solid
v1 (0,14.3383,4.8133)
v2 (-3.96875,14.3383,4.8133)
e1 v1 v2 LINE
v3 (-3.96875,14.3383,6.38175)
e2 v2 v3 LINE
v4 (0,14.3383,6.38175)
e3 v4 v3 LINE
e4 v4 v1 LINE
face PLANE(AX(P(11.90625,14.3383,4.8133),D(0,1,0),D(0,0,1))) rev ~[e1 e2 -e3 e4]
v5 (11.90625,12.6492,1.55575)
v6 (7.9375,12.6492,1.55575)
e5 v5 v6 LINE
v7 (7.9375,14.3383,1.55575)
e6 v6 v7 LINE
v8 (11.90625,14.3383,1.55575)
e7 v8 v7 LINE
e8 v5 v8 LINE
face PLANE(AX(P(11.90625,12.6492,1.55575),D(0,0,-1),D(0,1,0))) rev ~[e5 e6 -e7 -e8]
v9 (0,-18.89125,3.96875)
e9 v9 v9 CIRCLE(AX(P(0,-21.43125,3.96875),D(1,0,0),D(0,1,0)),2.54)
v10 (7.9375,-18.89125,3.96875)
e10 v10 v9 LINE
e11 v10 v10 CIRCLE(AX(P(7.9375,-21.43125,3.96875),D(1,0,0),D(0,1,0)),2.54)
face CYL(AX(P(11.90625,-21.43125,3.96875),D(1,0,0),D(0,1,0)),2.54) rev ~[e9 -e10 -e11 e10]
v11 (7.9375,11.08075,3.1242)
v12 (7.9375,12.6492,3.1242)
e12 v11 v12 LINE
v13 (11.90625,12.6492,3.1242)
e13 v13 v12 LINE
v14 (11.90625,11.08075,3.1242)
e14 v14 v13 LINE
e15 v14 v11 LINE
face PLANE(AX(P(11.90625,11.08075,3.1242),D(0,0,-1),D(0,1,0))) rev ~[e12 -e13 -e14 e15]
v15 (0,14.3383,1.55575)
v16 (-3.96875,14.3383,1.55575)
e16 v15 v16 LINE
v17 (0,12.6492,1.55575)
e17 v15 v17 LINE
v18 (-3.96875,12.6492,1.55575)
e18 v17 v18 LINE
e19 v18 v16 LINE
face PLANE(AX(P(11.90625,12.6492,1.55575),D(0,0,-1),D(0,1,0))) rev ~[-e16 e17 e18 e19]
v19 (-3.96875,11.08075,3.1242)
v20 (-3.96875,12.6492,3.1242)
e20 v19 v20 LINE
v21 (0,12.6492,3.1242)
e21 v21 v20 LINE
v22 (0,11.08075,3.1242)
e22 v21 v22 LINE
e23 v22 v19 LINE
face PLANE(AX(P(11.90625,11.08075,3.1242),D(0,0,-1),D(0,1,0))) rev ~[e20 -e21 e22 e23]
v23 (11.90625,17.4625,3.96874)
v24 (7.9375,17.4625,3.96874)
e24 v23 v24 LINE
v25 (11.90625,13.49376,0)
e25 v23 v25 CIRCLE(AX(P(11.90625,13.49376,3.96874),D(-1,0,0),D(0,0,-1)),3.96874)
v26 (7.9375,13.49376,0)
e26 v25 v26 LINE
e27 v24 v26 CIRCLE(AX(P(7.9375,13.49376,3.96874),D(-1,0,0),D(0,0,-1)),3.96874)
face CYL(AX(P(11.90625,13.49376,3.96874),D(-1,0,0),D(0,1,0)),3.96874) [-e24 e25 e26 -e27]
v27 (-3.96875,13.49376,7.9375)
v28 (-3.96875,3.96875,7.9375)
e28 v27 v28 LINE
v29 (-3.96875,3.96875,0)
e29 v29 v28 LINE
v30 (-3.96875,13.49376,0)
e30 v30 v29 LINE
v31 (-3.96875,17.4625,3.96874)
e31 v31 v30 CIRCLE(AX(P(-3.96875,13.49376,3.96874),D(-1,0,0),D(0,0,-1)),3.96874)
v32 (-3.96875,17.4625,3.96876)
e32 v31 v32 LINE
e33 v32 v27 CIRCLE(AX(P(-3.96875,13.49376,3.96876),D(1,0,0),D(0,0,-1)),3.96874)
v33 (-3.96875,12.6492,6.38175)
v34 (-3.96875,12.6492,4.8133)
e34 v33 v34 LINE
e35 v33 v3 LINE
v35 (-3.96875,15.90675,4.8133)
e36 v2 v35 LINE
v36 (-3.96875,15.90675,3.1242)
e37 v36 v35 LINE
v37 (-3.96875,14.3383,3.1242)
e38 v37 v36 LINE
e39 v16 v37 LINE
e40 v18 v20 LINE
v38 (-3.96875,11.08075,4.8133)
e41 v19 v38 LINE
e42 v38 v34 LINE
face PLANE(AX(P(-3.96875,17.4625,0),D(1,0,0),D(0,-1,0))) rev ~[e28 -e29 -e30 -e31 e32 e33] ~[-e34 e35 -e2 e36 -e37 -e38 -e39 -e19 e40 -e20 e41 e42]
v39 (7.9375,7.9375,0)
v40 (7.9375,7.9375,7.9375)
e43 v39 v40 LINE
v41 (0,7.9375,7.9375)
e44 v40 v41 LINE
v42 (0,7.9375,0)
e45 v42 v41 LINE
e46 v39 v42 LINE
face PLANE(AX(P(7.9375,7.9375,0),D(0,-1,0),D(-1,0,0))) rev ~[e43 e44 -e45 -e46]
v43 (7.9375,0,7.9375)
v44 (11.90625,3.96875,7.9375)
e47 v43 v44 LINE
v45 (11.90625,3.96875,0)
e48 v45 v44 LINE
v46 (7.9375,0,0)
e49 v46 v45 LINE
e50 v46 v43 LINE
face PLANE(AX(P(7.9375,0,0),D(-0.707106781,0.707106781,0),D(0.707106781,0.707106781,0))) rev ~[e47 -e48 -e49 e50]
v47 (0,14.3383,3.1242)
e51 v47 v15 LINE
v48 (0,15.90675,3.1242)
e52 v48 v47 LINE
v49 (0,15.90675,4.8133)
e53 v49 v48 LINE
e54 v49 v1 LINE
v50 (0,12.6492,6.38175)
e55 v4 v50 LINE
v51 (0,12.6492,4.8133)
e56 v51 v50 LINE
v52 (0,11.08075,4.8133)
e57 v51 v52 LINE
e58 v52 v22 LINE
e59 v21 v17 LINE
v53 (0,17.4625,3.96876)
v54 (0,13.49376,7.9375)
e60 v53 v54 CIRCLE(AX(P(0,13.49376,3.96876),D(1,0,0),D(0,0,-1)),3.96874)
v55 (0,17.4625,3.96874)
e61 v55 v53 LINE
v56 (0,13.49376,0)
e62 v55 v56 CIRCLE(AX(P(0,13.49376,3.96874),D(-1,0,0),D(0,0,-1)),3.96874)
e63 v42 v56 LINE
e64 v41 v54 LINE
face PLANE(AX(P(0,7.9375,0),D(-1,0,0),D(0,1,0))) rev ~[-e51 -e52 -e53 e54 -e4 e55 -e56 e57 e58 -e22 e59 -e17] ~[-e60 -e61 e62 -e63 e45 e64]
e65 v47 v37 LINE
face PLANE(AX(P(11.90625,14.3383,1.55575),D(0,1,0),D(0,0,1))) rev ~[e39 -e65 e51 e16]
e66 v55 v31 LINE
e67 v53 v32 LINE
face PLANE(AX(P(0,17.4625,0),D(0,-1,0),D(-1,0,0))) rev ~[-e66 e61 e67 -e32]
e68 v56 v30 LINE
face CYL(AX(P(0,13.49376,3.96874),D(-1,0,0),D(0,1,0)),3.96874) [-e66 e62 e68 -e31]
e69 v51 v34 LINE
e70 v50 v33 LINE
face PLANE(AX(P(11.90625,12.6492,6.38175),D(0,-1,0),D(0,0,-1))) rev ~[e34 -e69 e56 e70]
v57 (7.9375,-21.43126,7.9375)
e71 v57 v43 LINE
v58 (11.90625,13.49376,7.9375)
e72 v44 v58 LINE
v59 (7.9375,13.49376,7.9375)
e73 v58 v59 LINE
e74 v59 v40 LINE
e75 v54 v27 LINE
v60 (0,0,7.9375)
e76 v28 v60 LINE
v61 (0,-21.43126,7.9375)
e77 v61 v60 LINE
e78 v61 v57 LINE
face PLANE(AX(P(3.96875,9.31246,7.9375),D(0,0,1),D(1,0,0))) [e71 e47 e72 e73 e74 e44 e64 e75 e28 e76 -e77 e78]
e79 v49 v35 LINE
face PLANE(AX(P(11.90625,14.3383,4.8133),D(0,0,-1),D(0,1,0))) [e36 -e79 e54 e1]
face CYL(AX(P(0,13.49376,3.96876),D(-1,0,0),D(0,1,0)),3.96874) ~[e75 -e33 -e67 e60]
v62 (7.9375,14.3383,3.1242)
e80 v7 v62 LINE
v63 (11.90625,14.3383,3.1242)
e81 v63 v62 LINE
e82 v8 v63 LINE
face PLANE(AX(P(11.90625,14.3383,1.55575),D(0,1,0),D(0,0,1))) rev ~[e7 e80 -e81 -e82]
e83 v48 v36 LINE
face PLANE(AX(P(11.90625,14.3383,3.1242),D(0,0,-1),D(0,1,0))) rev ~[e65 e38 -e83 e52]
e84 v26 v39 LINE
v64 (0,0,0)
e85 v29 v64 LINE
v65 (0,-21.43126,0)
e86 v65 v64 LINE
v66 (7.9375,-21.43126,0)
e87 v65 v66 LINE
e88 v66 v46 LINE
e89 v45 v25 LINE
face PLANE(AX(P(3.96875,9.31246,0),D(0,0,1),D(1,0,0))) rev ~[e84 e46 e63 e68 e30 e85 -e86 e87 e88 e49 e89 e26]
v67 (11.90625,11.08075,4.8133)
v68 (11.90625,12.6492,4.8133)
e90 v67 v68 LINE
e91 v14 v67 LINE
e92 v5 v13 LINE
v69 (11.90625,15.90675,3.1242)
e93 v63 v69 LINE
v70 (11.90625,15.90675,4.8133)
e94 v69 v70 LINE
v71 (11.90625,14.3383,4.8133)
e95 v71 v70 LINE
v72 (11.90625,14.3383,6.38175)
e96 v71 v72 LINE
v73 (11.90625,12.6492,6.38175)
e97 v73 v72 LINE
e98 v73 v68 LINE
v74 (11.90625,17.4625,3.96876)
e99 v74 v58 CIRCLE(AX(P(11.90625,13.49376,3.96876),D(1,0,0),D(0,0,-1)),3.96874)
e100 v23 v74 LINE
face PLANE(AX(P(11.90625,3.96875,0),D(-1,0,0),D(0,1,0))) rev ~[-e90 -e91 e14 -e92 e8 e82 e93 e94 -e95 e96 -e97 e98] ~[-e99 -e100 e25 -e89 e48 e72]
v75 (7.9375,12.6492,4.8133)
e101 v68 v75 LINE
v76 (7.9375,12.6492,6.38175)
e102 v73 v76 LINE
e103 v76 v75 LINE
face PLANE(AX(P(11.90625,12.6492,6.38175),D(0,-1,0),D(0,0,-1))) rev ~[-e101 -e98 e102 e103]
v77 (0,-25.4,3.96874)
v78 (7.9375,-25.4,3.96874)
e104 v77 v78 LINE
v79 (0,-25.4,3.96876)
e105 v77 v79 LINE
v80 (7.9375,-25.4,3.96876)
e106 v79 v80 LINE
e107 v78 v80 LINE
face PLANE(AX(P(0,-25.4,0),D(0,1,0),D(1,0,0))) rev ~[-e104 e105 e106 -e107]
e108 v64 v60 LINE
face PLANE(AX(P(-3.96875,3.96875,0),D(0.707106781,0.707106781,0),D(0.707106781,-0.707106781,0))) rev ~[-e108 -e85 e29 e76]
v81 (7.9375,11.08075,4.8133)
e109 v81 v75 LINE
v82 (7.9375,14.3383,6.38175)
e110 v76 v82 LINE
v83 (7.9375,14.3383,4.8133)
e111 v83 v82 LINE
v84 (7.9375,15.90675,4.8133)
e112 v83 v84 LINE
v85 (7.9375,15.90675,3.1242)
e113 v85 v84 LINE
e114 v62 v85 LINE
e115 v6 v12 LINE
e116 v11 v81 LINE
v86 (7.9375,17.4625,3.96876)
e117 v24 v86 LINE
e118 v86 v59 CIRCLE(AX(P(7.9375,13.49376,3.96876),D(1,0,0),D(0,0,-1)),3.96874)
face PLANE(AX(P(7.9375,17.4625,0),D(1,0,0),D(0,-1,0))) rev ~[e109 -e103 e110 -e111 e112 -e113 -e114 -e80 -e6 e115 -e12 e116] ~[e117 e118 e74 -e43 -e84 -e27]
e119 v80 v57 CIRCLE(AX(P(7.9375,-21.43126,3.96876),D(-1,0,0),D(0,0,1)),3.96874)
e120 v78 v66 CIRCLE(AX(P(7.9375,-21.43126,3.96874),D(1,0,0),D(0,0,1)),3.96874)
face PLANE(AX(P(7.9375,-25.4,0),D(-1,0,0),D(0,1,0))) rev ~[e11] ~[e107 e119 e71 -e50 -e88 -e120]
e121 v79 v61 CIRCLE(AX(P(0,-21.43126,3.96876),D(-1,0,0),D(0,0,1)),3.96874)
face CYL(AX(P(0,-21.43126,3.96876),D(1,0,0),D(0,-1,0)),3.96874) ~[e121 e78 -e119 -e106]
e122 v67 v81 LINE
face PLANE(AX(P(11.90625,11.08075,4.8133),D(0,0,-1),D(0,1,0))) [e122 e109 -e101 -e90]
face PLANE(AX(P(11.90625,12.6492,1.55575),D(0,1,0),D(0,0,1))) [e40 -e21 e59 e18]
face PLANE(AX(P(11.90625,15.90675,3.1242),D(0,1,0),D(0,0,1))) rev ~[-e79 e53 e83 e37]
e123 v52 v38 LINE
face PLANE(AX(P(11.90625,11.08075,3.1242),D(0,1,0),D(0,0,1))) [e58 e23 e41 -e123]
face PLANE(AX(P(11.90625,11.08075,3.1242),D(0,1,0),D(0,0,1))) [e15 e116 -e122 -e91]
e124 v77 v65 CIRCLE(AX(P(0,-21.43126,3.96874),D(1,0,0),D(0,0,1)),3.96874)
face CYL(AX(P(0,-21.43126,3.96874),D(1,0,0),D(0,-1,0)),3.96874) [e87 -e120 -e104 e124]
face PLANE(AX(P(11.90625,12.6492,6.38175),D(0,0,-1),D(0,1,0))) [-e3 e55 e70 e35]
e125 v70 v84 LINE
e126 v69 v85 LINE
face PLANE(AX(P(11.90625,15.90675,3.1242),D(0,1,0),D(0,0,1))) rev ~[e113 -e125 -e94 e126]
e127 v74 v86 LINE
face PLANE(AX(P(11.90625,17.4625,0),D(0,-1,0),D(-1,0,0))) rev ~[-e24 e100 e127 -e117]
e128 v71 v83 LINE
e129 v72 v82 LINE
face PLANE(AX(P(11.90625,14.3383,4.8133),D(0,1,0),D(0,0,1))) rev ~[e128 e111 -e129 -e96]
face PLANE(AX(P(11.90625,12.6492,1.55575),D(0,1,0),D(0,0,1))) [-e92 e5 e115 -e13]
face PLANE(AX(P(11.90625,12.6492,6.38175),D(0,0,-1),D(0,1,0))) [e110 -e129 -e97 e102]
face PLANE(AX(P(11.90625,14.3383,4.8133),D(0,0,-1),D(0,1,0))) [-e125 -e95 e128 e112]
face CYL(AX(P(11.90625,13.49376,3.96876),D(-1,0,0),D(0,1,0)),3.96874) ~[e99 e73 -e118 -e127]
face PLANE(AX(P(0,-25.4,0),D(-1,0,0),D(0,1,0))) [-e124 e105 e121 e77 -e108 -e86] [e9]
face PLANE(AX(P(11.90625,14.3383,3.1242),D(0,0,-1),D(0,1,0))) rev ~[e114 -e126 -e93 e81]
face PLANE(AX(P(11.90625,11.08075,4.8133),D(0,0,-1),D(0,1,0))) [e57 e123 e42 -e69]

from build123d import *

# Parameters (mm, degrees)
F0_W     = 7.9375
F0_H     = 25.4
F1_DEPTH = 7.9375
F2_R     = 3.96874
F3_W     = 1.6891
F3_H     = 1.56845
F3_W_2   = 1.56845
F3_H_2   = 1.6891
F3_R     = 2.54
F4_DEPTH = 15.875


# Not quite as in the source:
# - a fillet or chamfer is up to 0.001 mm smaller than in the source, because OpenCascade refuses the exact size


with BuildPart() as f1:
    # F0 (on Top) → F1 (new body)
    with BuildSketch(Plane.XY):
        Polygon((-3.96875, 3.96875), (0, 0), (7.9375, 0), (11.90625, 3.96875), (11.90625, 17.4625), (7.9375, 17.4625), (7.9375, 7.9375), (0, 7.9375), (0, 17.4625), (-3.96875, 17.4625), align=None)
        with Locations((3.96875, -12.7)):
            Rectangle(F0_W, F0_H)
    extrude(amount=F1_DEPTH)

    # F2 (radius 3.96875 in the source; OpenCascade refuses exactly that, so slightly less here)
    f2_edges = [f1.edges().sort_by_distance(p)[0] for p in [
        (3.96875, -25.4, 7.9375),
        (3.96875, -25.4, 0),
        (9.921875, 17.4625, 7.9375),
        (9.921875, 17.4625, 0),
        (-1.984375, 17.4625, 7.9375),
        (-1.984375, 17.4625, 0),
    ]]
    fillet(f2_edges, radius=F2_R)

    # F3 (on face) → F4 (cut, through all)
    with BuildSketch(Plane.YZ.offset(11.90625)):
        with Locations((13.49375, 5.597525)):
            Rectangle(F3_W, F3_H)
        with Locations((15.122525, 3.96875)):
            Rectangle(F3_W_2, F3_H_2)
        with Locations((13.49375, 3.96875)):
            Rectangle(F3_W, F3_H_2)
        with Locations((11.864975, 3.96875)):
            Rectangle(F3_W_2, F3_H_2)
        with Locations((13.49375, 2.339975)):
            Rectangle(F3_W, F3_H)
        with Locations((-21.43125, 3.96875)):
            Circle(F3_R)
    extrude(amount=-F4_DEPTH, mode=Mode.SUBTRACT)


solid = f1.part
